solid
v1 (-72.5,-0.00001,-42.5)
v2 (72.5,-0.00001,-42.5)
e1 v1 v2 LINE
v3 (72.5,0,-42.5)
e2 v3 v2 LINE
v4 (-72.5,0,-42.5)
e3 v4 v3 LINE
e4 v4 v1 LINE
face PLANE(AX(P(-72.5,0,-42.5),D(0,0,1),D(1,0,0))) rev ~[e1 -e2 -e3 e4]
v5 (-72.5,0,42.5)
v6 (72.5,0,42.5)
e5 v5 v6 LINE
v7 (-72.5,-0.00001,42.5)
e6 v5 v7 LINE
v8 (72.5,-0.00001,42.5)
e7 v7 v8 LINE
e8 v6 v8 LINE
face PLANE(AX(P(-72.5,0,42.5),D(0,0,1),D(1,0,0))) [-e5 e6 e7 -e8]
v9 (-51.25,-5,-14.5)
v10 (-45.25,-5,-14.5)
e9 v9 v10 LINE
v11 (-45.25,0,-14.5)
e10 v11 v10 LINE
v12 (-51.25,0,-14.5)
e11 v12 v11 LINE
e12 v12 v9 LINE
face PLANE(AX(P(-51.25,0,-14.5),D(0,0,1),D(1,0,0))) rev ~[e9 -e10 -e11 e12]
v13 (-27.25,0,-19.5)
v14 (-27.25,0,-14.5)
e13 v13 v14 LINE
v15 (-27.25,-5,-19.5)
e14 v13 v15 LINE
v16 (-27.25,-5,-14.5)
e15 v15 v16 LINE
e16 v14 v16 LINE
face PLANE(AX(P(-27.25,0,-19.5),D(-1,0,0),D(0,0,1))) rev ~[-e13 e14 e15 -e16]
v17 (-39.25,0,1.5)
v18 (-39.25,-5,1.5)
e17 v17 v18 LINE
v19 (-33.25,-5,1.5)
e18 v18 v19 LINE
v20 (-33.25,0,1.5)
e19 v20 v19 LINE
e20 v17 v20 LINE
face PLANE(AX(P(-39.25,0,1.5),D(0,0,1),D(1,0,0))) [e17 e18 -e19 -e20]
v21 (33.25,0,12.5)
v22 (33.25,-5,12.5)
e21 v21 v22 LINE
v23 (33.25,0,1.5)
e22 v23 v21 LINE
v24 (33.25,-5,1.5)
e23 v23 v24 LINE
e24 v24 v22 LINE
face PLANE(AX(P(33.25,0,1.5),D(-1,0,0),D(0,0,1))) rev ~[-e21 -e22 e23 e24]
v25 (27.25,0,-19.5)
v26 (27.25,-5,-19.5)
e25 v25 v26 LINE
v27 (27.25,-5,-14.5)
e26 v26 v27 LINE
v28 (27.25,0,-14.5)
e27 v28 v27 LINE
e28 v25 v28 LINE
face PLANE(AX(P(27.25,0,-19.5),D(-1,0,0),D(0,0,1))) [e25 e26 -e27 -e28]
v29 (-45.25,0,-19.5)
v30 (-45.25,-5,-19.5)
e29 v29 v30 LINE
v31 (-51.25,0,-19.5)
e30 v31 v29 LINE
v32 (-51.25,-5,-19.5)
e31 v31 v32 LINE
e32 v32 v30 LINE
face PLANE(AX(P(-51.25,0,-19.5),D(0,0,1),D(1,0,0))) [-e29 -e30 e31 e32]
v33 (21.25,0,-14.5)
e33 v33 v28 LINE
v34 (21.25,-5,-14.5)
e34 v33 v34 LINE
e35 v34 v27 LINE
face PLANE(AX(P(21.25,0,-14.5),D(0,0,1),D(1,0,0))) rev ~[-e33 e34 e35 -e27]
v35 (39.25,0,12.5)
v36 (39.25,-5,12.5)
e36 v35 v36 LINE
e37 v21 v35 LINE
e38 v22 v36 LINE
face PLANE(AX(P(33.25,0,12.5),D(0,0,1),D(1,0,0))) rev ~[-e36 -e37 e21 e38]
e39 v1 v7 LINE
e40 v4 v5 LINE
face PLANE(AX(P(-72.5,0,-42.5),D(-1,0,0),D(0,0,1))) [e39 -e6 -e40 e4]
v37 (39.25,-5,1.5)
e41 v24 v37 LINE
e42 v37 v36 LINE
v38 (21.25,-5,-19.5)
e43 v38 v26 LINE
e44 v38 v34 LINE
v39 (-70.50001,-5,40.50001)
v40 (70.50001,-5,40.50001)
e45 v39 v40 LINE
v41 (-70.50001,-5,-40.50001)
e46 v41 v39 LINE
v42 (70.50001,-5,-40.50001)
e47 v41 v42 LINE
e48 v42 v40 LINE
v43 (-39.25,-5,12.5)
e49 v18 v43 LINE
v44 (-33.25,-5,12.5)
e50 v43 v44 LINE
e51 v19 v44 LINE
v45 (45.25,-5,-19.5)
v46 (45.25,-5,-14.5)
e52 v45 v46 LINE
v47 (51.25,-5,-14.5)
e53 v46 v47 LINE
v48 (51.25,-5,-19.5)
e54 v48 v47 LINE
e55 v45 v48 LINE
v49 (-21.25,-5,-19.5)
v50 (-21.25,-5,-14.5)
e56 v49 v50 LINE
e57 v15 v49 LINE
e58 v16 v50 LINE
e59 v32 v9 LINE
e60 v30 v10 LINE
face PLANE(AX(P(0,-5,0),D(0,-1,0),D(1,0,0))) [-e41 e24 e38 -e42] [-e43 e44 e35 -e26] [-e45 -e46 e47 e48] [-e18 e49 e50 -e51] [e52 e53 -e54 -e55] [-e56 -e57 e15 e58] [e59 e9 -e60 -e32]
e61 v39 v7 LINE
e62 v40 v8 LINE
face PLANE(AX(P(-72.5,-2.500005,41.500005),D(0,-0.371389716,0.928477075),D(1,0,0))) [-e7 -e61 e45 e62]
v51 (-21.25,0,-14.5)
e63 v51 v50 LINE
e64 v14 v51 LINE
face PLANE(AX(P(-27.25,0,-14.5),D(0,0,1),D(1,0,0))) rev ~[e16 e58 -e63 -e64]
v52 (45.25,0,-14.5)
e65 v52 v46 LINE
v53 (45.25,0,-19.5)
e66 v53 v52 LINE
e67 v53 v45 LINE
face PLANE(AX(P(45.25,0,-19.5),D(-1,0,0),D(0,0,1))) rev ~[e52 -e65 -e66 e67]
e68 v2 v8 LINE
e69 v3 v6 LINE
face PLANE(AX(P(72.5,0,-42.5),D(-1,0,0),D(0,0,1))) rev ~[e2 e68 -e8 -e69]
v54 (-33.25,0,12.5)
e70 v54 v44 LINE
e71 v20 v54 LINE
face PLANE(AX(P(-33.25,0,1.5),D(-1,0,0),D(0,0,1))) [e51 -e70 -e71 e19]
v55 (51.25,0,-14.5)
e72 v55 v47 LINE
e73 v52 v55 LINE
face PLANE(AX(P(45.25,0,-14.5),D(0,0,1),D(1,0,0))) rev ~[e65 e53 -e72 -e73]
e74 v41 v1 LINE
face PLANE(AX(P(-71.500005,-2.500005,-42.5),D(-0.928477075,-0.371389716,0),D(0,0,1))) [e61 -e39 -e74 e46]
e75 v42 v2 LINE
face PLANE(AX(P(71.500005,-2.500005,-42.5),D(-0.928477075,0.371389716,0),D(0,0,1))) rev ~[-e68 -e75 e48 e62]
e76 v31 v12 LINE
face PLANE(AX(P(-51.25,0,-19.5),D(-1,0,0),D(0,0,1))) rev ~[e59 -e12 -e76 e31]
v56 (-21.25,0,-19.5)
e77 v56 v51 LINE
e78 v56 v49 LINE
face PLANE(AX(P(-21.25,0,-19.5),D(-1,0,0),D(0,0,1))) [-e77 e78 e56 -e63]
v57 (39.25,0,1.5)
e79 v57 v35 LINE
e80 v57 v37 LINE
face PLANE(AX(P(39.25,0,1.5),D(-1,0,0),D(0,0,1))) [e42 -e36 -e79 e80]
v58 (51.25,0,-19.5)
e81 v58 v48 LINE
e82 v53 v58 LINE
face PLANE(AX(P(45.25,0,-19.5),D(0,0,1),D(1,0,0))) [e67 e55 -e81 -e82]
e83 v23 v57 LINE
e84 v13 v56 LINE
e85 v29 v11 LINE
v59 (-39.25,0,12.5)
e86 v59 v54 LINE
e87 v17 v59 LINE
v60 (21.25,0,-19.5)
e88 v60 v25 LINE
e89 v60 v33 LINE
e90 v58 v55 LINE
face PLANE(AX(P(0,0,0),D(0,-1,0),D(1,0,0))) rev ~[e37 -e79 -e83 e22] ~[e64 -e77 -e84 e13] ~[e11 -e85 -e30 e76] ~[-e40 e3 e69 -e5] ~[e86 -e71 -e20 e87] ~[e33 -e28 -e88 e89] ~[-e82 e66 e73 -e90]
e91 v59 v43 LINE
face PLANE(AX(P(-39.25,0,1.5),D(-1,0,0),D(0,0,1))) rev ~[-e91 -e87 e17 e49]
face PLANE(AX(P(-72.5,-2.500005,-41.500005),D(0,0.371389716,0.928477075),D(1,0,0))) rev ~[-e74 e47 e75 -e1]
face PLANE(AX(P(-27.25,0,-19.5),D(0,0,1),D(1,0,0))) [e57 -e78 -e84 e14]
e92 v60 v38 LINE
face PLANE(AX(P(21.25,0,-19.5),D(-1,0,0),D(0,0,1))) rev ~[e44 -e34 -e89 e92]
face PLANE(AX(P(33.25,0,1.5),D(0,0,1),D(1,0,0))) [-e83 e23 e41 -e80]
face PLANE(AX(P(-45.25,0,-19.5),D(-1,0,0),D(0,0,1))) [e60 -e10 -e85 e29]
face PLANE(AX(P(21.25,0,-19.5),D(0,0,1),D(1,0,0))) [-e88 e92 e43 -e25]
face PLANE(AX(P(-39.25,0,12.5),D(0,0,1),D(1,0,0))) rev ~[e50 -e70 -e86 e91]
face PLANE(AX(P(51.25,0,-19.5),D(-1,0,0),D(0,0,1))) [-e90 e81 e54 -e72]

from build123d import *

# Parameters (mm, degrees)
F0_W     = 145
F0_H     = 85
F1_DEPTH = 5
F2_W     = 6
F2_H     = 11
F2_H_2   = 5
F3_DEPTH = 5
F4_SIZE2 = 4.99999
F4_SIZE  = 1.99999


# Not quite as in the source:
# - a fillet or chamfer is up to 0.001 mm smaller than in the source, because OpenCascade refuses the exact size


with BuildPart() as f1:
    # F0 (on Front) → F1 (new body)
    with BuildSketch(Plane.XZ):
        Rectangle(F0_W, F0_H)
    extrude(amount=F1_DEPTH)

    # F2 (on Front) → F3 (cut, through all)
    with BuildSketch(Plane.XZ):
        with Locations((-36.25, 7)):
            Rectangle(F2_W, F2_H)
        with Locations((-48.25, -17)):
            Rectangle(F2_W, F2_H_2)
        with Locations((-24.25, -17)):
            Rectangle(F2_W, F2_H_2)
        with Locations((36.25, 7)):
            Rectangle(F2_W, F2_H)
        with Locations((48.25, -17)):
            Rectangle(F2_W, F2_H_2)
        with Locations((24.25, -17)):
            Rectangle(F2_W, F2_H_2)
    extrude(amount=F3_DEPTH, mode=Mode.SUBTRACT)

    # F4 (size 2 and 5 in the source; OpenCascade refuses exactly that, so slightly less here)
    f4_edges = [f1.edges().sort_by_distance(p)[0] for p in [
        (0, -5, 42.5),
        (-72.5, -5, 0),
        (0, -5, -42.5),
        (72.5, -5, 0),
    ]]
    f4_side = f1.faces().sort_by_distance((0, -5, 0.092438))[0]
    chamfer(f4_edges, length=F4_SIZE, length2=F4_SIZE2, reference=f4_side)


solid = f1.part
